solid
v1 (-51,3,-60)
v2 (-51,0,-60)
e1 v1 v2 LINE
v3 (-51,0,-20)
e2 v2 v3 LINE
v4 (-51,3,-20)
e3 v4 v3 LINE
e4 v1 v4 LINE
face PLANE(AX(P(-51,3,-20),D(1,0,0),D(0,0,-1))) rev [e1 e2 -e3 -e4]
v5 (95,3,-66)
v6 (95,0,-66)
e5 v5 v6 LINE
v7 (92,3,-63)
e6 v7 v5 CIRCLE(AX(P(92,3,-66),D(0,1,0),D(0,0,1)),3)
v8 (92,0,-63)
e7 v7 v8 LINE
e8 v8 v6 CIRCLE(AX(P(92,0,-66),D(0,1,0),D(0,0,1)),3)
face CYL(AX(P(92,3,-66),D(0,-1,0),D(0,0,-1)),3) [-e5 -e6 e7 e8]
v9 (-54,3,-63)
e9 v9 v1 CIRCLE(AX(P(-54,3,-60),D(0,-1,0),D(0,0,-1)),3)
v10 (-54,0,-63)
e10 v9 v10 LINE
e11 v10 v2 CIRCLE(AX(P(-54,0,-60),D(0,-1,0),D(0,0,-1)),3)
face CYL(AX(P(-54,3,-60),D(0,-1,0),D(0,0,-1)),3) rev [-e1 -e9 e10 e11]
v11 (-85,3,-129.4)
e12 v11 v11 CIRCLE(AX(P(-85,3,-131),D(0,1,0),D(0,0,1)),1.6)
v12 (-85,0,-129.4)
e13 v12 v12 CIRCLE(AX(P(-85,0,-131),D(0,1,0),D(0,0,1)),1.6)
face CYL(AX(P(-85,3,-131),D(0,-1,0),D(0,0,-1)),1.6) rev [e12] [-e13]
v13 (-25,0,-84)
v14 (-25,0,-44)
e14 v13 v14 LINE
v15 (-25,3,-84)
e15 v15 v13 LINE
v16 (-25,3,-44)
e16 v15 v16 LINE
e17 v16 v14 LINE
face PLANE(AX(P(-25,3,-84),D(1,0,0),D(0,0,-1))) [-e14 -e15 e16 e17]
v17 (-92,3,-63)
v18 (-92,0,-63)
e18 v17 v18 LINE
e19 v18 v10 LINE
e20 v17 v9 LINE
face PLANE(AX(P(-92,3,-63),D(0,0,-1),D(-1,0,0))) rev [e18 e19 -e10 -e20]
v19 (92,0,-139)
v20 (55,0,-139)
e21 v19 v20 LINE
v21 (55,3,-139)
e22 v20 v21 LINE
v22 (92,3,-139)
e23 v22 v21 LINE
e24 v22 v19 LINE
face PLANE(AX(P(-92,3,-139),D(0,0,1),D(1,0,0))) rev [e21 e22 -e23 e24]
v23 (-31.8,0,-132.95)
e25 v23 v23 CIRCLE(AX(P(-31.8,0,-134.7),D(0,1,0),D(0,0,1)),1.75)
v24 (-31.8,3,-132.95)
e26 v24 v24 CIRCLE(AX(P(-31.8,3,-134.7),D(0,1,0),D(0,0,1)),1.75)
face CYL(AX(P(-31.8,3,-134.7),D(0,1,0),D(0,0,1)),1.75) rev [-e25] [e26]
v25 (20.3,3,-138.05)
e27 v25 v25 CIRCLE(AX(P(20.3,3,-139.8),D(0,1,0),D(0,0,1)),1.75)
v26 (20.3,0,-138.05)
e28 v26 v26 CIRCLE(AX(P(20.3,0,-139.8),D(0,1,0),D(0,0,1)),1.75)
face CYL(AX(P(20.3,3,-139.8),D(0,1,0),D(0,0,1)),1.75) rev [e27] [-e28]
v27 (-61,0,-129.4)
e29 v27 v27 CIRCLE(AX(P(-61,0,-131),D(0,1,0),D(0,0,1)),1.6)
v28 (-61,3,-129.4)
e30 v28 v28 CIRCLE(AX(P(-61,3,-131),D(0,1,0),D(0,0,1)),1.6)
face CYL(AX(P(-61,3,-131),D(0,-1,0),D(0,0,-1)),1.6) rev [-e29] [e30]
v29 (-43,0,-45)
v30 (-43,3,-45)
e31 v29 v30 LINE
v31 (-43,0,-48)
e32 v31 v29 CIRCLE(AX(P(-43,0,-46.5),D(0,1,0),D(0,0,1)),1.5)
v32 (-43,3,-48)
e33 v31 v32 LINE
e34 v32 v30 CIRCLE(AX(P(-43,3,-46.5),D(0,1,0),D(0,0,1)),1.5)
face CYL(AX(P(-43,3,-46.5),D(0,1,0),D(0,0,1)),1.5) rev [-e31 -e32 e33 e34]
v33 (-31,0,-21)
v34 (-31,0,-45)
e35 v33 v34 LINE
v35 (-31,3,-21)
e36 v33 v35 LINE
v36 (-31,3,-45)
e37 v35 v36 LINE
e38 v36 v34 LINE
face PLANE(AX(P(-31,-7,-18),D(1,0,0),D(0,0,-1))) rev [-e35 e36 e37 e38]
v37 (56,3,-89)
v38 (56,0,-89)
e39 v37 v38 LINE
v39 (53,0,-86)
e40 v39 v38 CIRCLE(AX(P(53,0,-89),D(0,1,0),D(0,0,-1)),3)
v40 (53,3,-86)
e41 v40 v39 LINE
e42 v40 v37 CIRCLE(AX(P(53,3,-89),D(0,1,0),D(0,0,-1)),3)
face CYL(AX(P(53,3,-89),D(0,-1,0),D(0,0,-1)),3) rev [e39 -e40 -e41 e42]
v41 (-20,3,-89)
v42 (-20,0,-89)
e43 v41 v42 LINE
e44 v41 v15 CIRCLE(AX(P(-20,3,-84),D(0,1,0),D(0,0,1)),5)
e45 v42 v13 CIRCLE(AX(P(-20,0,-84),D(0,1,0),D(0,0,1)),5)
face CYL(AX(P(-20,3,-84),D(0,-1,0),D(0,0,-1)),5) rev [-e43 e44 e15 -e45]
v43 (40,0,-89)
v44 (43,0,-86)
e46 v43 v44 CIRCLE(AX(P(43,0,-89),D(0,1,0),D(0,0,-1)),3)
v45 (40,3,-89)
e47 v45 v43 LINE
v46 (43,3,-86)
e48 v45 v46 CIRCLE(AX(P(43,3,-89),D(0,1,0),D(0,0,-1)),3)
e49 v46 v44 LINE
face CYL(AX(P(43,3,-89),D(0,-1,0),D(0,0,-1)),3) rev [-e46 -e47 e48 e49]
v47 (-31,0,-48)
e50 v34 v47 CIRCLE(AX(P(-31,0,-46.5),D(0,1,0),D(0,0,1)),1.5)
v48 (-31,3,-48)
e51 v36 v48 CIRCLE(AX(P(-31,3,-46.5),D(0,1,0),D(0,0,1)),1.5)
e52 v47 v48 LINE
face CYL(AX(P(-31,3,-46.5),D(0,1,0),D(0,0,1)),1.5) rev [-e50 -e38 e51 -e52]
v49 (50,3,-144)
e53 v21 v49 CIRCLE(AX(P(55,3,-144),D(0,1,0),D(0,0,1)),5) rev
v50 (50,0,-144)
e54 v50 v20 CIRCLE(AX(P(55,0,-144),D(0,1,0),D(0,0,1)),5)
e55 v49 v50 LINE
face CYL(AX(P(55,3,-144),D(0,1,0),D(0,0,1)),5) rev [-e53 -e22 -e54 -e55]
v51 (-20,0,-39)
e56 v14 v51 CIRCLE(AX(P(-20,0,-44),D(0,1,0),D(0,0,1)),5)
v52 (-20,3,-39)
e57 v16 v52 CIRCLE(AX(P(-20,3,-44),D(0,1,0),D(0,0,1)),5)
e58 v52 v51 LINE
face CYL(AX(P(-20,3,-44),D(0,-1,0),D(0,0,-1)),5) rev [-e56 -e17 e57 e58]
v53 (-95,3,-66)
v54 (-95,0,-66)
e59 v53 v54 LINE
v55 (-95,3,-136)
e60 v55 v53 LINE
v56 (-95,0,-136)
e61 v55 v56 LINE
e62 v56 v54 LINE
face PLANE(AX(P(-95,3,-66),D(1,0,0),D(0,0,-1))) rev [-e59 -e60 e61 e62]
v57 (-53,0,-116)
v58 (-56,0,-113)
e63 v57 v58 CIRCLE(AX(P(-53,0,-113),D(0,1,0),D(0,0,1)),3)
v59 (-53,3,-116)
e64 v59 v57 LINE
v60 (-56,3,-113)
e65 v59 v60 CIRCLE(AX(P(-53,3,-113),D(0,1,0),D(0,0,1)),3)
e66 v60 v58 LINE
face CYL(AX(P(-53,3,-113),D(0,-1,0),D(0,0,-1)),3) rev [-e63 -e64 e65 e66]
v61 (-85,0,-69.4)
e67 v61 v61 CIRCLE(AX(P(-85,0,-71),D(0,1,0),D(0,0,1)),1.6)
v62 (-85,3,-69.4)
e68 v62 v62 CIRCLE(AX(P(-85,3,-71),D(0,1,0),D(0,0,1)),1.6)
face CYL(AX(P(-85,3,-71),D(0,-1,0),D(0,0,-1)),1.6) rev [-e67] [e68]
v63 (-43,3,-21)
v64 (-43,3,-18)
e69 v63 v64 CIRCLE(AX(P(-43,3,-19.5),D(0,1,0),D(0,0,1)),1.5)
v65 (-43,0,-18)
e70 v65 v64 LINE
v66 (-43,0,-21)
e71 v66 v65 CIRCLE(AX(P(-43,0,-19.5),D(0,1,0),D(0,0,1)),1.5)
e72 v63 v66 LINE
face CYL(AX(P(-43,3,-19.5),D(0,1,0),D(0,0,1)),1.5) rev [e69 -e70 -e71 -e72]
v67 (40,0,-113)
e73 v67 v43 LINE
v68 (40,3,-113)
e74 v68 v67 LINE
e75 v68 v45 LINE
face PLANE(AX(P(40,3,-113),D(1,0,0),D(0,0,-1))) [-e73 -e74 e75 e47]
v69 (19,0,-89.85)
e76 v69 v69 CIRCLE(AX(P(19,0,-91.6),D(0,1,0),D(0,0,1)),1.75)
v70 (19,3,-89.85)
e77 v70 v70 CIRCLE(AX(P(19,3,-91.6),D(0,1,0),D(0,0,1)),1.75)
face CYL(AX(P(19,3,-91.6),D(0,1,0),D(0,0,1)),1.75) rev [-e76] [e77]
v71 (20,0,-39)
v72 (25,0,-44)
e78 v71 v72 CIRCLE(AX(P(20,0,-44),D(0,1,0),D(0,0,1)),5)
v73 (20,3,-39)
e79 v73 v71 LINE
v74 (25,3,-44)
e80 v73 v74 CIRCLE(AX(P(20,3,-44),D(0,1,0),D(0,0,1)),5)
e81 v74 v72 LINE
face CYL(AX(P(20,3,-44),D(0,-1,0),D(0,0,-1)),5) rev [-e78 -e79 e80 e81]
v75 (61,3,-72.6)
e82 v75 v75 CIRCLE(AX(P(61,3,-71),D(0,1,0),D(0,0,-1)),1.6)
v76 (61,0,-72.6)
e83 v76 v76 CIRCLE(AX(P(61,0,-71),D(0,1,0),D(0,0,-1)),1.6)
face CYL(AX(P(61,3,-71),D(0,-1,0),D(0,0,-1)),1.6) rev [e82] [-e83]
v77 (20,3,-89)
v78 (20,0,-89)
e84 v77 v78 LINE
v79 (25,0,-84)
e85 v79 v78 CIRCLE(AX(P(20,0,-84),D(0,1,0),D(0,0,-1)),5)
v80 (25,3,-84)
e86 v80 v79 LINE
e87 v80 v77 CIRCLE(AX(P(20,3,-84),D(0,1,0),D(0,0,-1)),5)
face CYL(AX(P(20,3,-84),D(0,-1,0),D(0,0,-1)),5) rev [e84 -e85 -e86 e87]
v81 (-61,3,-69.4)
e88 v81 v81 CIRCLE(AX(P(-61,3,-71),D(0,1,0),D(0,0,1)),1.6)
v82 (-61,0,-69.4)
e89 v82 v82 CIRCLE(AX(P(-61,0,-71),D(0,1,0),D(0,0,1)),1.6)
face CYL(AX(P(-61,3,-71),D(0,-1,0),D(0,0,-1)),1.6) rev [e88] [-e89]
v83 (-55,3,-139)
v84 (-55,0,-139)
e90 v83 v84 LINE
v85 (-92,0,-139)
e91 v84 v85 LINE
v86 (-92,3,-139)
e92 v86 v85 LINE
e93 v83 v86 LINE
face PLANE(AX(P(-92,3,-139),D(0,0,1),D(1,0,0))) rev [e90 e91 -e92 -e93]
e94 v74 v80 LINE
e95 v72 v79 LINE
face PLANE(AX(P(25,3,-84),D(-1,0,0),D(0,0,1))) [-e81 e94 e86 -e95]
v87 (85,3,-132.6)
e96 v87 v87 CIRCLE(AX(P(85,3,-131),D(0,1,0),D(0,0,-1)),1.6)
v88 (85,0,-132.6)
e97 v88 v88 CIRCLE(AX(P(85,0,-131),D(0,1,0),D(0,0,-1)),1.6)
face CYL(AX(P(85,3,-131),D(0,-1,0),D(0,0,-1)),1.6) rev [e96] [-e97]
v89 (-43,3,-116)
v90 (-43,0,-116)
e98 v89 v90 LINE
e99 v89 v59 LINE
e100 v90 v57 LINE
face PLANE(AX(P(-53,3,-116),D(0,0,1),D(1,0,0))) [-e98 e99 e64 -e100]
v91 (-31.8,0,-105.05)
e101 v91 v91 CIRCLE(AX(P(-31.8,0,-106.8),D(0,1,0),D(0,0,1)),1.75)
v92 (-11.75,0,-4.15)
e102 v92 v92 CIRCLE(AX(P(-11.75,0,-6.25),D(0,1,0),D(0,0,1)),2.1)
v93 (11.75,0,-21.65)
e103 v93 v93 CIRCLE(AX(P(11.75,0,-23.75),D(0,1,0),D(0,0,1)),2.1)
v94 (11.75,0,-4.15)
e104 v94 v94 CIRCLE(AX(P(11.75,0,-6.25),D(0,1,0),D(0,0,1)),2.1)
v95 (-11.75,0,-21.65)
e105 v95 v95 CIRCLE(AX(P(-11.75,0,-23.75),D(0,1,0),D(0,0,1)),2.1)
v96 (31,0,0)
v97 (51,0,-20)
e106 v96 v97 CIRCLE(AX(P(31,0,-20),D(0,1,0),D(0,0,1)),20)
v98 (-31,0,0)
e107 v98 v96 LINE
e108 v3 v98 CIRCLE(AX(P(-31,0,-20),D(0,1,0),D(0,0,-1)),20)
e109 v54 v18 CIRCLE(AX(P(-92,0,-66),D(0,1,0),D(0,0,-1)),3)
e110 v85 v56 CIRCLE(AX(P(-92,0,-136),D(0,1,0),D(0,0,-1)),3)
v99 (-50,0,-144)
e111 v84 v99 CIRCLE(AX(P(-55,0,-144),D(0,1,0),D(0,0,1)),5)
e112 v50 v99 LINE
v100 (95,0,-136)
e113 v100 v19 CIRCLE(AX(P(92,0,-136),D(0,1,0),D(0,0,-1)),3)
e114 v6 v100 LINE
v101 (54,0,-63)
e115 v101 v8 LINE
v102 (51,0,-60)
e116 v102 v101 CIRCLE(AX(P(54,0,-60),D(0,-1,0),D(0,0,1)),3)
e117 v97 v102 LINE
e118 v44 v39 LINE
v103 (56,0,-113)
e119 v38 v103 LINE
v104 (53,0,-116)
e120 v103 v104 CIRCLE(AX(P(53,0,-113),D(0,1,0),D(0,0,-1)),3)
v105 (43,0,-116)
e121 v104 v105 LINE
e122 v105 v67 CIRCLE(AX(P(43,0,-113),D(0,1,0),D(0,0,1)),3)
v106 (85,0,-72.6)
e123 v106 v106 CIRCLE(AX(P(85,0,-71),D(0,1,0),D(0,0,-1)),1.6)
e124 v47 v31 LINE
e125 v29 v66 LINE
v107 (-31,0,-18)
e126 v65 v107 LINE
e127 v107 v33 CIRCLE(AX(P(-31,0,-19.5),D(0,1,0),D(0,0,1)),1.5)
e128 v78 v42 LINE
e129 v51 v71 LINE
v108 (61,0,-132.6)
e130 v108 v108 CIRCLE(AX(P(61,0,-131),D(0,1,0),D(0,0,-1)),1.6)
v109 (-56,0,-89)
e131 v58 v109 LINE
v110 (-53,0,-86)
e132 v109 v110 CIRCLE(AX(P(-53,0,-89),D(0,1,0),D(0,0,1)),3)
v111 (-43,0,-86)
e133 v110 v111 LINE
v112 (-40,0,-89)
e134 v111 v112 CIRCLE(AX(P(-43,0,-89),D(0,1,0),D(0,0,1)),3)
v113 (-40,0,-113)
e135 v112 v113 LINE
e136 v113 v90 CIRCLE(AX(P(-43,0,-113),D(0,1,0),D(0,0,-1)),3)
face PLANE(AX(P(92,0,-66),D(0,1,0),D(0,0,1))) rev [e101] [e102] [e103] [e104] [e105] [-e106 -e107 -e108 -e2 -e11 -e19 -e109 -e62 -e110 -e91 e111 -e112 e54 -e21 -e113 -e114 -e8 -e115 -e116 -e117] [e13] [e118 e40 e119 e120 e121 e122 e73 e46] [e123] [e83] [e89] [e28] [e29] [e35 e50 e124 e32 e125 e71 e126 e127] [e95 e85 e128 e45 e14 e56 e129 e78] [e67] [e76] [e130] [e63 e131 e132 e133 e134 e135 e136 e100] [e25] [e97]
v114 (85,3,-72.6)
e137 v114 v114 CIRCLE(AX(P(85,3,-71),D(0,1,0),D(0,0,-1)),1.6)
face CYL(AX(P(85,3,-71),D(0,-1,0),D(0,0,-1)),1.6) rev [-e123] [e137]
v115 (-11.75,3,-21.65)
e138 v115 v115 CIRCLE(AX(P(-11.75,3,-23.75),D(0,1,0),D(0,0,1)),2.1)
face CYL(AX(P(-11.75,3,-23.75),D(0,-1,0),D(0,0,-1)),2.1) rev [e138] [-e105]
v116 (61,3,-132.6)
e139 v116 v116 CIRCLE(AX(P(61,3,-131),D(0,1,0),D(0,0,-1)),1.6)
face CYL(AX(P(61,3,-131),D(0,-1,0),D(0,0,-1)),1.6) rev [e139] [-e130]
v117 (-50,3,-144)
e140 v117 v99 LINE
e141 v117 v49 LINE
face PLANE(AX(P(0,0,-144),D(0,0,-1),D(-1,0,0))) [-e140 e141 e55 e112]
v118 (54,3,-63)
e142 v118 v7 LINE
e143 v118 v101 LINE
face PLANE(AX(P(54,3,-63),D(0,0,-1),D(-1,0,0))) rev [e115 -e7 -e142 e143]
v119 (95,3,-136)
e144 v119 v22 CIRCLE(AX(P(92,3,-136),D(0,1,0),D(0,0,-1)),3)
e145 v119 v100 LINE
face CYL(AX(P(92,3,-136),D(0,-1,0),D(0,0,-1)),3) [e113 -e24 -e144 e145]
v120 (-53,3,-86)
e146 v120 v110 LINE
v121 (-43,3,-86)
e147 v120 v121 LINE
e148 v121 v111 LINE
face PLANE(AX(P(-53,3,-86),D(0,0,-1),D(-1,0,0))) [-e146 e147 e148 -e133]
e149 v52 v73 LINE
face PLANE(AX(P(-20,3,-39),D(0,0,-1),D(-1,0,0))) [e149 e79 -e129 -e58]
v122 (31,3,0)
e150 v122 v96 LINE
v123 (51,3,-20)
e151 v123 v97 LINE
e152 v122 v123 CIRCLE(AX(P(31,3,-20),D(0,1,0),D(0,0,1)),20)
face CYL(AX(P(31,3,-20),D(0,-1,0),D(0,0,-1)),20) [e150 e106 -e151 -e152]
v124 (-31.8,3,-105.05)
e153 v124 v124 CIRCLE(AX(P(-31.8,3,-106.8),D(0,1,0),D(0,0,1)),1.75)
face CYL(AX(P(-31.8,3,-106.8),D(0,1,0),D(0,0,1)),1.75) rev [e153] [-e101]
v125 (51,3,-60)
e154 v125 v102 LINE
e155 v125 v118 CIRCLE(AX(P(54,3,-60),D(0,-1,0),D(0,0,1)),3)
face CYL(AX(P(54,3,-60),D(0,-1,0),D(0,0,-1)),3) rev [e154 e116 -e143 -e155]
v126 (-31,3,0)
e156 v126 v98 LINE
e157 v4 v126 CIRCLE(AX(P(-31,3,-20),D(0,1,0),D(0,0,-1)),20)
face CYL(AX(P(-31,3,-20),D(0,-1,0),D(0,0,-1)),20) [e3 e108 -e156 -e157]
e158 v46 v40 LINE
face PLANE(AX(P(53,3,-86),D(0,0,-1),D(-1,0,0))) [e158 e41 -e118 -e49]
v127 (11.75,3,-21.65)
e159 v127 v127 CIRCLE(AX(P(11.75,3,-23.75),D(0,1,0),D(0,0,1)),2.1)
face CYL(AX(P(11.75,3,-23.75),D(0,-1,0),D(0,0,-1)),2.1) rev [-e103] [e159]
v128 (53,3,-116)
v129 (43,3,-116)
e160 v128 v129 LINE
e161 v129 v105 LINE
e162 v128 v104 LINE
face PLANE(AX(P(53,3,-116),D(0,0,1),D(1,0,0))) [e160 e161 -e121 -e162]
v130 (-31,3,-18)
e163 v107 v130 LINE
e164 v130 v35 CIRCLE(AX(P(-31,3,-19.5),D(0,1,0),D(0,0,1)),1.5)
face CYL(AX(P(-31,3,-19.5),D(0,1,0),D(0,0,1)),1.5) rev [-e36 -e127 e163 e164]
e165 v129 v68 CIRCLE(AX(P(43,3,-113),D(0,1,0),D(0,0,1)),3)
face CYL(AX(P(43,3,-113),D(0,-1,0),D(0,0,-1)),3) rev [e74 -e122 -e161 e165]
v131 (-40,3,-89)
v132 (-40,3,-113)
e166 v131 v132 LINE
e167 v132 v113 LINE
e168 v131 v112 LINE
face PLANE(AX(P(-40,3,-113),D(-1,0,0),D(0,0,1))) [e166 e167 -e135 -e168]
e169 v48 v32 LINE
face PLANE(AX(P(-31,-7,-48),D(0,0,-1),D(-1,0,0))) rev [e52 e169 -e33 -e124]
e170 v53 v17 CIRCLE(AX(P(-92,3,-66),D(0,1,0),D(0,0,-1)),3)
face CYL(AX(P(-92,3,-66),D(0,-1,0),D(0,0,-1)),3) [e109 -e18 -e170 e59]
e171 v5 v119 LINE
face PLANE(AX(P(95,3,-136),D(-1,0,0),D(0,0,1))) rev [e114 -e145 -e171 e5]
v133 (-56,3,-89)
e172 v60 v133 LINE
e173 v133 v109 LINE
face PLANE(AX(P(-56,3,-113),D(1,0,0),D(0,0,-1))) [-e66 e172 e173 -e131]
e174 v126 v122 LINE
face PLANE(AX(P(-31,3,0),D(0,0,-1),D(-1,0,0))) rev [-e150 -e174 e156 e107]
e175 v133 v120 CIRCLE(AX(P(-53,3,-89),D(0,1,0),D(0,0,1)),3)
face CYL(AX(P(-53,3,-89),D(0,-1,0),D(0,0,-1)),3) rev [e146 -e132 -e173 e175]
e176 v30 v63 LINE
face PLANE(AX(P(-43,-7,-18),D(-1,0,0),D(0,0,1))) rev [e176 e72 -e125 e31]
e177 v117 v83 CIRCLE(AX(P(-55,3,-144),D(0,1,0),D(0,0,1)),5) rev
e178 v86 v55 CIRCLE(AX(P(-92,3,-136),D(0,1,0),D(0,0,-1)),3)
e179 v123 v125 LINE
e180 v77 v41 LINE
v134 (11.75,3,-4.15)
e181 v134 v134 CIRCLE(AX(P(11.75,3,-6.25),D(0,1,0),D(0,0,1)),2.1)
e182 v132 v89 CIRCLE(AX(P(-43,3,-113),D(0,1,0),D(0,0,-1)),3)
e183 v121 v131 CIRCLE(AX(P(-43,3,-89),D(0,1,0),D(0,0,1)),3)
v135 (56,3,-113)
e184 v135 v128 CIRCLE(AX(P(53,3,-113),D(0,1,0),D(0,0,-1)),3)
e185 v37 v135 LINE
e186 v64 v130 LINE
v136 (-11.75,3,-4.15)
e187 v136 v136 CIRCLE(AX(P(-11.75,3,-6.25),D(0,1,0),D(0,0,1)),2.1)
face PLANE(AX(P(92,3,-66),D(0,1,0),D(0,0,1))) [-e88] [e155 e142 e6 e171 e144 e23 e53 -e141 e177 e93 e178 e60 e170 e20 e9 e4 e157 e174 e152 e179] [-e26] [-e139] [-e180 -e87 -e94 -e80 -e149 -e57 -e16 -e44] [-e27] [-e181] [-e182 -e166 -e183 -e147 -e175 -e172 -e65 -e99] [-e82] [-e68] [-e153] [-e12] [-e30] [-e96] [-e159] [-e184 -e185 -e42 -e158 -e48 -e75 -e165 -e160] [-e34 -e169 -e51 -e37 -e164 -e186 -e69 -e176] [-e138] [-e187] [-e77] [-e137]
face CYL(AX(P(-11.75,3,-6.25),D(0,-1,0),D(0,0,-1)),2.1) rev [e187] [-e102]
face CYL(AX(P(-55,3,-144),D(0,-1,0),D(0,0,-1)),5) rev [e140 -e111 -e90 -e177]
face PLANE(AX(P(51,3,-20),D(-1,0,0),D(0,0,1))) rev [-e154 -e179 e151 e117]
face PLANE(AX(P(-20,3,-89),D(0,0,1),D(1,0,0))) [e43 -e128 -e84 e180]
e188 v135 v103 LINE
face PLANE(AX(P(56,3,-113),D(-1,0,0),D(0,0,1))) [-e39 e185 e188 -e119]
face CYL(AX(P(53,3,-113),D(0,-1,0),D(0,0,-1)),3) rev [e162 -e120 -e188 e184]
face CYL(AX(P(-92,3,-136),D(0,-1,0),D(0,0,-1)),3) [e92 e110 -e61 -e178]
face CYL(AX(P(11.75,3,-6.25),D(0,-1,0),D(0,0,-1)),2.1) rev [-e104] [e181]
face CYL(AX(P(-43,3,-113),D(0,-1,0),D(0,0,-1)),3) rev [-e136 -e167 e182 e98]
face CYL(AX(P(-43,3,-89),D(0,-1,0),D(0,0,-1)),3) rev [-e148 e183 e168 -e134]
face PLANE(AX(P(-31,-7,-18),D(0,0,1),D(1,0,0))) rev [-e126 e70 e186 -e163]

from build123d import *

# Parameters (mm, degrees)
SKETCH_1_R          = 2.1
SKETCH_1_R_2        = 1.6
EXTRUDE_1_DEPTH     = 3
SKETCH_4_W          = 100
SKETCH_4_H          = 3
EXTRUDE_2_DEPTH     = 5
FILLET_1_R          = 5
HOLE_WIZARD_1_D     = 3.5
HOLE_WIZARD_1_DEPTH = 100
SKETCH_5_W          = 12
SKETCH_5_H          = 30
CUT_EXTRUDE_1_DEPTH = 10
HOLE_WIZARD_2_D     = 3


with BuildPart() as part:
    # 草图1 → 凸台-拉伸1 (new body)
    with BuildSketch(Plane(origin=(0, 0, 0), x_dir=(1, 0, 0), z_dir=(0, 1, 0))):
        with BuildLine():
            Line((-31, 0), (31, 0))
            ThreePointArc((31, 0), (45.142135624, 5.857864376), (51, 20))
            Line((51, 20), (51, 60))
            ThreePointArc((51, 60), (51.878679656, 62.121320344), (54, 63))
            Line((54, 63), (92, 63))
            ThreePointArc((92, 63), (94.121320344, 63.878679656), (95, 66))
            Line((95, 66), (95, 136))
            ThreePointArc((95, 136), (94.121320344, 138.121320344), (92, 139))
            Line((92, 139), (-92, 139))
            ThreePointArc((-92, 139), (-94.121320344, 138.121320344), (-95, 136))
            Line((-95, 136), (-95, 66))
            ThreePointArc((-95, 66), (-94.121320344, 63.878679656), (-92, 63))
            Line((-92, 63), (-54, 63))
            ThreePointArc((-54, 63), (-51.878679656, 62.121320344), (-51, 60))
            Line((-51, 60), (-51, 20))
            ThreePointArc((-51, 20), (-45.142135624, 5.857864376), (-31, 0))
        make_face()
        with Locations(Location((-11.75, 23.75, 0), (0, 0, 270))):
            Circle(SKETCH_1_R, mode=Mode.SUBTRACT)
        with Locations(Location((11.75, 23.75, 0), (0, 0, 270))):
            Circle(SKETCH_1_R, mode=Mode.SUBTRACT)
        with Locations(Location((11.75, 6.25, 0), (0, 0, 270))):
            Circle(SKETCH_1_R, mode=Mode.SUBTRACT)
        with Locations(Location((-11.75, 6.25, 0), (0, 0, 270))):
            Circle(SKETCH_1_R, mode=Mode.SUBTRACT)
        with Locations(Location((-61, 71, 0), (0, 0, 270))):
            Circle(SKETCH_1_R_2, mode=Mode.SUBTRACT)
        with Locations(Location((-61, 131, 0), (0, 0, 270))):
            Circle(SKETCH_1_R_2, mode=Mode.SUBTRACT)
        with Locations(Location((-85, 131, 0), (0, 0, 270))):
            Circle(SKETCH_1_R_2, mode=Mode.SUBTRACT)
        with Locations(Location((-85, 71, 0), (0, 0, 270))):
            Circle(SKETCH_1_R_2, mode=Mode.SUBTRACT)
        with Locations(Location((85, 71, 0), (0, 0, 90))):
            Circle(SKETCH_1_R_2, mode=Mode.SUBTRACT)
        with Locations(Location((85, 131, 0), (0, 0, 90))):
            Circle(SKETCH_1_R_2, mode=Mode.SUBTRACT)
        with Locations(Location((61, 131, 0), (0, 0, 90))):
            Circle(SKETCH_1_R_2, mode=Mode.SUBTRACT)
        with Locations(Location((61, 71, 0), (0, 0, 90))):
            Circle(SKETCH_1_R_2, mode=Mode.SUBTRACT)
        with BuildLine():
            Line((-53, 116), (-43, 116))
            ThreePointArc((-43, 116), (-40.878679656, 115.121320344), (-40, 113))
            Line((-40, 113), (-40, 89))
            ThreePointArc((-40, 89), (-40.878679656, 86.878679656), (-43, 86))
            Line((-43, 86), (-53, 86))
            ThreePointArc((-53, 86), (-55.121320344, 86.878679656), (-56, 89))
            Line((-56, 89), (-56, 113))
            ThreePointArc((-56, 113), (-55.121320344, 115.121320344), (-53, 116))
        make_face(mode=Mode.SUBTRACT)
        with BuildLine():
            Line((40, 113), (40, 89))
            ThreePointArc((40, 89), (40.878679656, 86.878679656), (43, 86))
            Line((43, 86), (53, 86))
            ThreePointArc((53, 86), (55.121320344, 86.878679656), (56, 89))
            Line((56, 89), (56, 113))
            ThreePointArc((56, 113), (55.121320344, 115.121320344), (53, 116))
            Line((53, 116), (43, 116))
            ThreePointArc((43, 116), (40.878679656, 115.121320344), (40, 113))
        make_face(mode=Mode.SUBTRACT)
        with BuildLine():
            Line((-20, 89), (20, 89))
            ThreePointArc((20, 89), (23.535533906, 87.535533906), (25, 84))
            Line((25, 84), (25, 44))
            ThreePointArc((25, 44), (23.535533906, 40.464466094), (20, 39))
            Line((20, 39), (-20, 39))
            ThreePointArc((-20, 39), (-23.535533906, 40.464466094), (-25, 44))
            Line((-25, 44), (-25, 84))
            ThreePointArc((-25, 84), (-23.535533906, 87.535533906), (-20, 89))
        make_face(mode=Mode.SUBTRACT)
    extrude(amount=EXTRUDE_1_DEPTH)

    # 草图4 → 凸台-拉伸2 (add)
    with BuildSketch(Plane(origin=(0, 0, -139), x_dir=(-1, 0, 0), z_dir=(0, 0, -1))):
        with Locations((0, 1.5)):
            Rectangle(SKETCH_4_W, SKETCH_4_H)
    extrude(amount=EXTRUDE_2_DEPTH)

    # 圆角1
    fillet_1_edges = [part.edges().sort_by_distance(p)[0] for p in [
        (50, 1.5, -139),
        (-50, 1.5, -139),
    ]]
    fillet(fillet_1_edges, radius=FILLET_1_R - 0.0001)  # a hair under: the kernel refuses the full size

    # 孔1
    with Locations(Plane(origin=(0, 3, 0), x_dir=(1, 0, 0), z_dir=(0, 1, 0))):
        with Locations((-31.8, 134.7), (-31.8, 106.8), (19, 91.6), (20.3, 139.8)):
            Hole(HOLE_WIZARD_1_D / 2, depth=HOLE_WIZARD_1_DEPTH)

    # 草图5 → 切除-拉伸1 (cut)
    with BuildSketch(Plane(origin=(0, 3, 0), x_dir=(1, 0, 0), z_dir=(0, 1, 0))):
        with Locations((-37, 33)):
            Rectangle(SKETCH_5_W, SKETCH_5_H)
    extrude(amount=-CUT_EXTRUDE_1_DEPTH, mode=Mode.SUBTRACT)

    # 孔2 (through all)
    with Locations(Plane(origin=(0, 3, 0), x_dir=(1, 0, 0), z_dir=(0, 1, 0))):
        with Locations((-43, 46.5), (-31, 46.5), (-31, 19.5), (-43, 19.5)):
            Hole(HOLE_WIZARD_2_D / 2)


solid = part.part
